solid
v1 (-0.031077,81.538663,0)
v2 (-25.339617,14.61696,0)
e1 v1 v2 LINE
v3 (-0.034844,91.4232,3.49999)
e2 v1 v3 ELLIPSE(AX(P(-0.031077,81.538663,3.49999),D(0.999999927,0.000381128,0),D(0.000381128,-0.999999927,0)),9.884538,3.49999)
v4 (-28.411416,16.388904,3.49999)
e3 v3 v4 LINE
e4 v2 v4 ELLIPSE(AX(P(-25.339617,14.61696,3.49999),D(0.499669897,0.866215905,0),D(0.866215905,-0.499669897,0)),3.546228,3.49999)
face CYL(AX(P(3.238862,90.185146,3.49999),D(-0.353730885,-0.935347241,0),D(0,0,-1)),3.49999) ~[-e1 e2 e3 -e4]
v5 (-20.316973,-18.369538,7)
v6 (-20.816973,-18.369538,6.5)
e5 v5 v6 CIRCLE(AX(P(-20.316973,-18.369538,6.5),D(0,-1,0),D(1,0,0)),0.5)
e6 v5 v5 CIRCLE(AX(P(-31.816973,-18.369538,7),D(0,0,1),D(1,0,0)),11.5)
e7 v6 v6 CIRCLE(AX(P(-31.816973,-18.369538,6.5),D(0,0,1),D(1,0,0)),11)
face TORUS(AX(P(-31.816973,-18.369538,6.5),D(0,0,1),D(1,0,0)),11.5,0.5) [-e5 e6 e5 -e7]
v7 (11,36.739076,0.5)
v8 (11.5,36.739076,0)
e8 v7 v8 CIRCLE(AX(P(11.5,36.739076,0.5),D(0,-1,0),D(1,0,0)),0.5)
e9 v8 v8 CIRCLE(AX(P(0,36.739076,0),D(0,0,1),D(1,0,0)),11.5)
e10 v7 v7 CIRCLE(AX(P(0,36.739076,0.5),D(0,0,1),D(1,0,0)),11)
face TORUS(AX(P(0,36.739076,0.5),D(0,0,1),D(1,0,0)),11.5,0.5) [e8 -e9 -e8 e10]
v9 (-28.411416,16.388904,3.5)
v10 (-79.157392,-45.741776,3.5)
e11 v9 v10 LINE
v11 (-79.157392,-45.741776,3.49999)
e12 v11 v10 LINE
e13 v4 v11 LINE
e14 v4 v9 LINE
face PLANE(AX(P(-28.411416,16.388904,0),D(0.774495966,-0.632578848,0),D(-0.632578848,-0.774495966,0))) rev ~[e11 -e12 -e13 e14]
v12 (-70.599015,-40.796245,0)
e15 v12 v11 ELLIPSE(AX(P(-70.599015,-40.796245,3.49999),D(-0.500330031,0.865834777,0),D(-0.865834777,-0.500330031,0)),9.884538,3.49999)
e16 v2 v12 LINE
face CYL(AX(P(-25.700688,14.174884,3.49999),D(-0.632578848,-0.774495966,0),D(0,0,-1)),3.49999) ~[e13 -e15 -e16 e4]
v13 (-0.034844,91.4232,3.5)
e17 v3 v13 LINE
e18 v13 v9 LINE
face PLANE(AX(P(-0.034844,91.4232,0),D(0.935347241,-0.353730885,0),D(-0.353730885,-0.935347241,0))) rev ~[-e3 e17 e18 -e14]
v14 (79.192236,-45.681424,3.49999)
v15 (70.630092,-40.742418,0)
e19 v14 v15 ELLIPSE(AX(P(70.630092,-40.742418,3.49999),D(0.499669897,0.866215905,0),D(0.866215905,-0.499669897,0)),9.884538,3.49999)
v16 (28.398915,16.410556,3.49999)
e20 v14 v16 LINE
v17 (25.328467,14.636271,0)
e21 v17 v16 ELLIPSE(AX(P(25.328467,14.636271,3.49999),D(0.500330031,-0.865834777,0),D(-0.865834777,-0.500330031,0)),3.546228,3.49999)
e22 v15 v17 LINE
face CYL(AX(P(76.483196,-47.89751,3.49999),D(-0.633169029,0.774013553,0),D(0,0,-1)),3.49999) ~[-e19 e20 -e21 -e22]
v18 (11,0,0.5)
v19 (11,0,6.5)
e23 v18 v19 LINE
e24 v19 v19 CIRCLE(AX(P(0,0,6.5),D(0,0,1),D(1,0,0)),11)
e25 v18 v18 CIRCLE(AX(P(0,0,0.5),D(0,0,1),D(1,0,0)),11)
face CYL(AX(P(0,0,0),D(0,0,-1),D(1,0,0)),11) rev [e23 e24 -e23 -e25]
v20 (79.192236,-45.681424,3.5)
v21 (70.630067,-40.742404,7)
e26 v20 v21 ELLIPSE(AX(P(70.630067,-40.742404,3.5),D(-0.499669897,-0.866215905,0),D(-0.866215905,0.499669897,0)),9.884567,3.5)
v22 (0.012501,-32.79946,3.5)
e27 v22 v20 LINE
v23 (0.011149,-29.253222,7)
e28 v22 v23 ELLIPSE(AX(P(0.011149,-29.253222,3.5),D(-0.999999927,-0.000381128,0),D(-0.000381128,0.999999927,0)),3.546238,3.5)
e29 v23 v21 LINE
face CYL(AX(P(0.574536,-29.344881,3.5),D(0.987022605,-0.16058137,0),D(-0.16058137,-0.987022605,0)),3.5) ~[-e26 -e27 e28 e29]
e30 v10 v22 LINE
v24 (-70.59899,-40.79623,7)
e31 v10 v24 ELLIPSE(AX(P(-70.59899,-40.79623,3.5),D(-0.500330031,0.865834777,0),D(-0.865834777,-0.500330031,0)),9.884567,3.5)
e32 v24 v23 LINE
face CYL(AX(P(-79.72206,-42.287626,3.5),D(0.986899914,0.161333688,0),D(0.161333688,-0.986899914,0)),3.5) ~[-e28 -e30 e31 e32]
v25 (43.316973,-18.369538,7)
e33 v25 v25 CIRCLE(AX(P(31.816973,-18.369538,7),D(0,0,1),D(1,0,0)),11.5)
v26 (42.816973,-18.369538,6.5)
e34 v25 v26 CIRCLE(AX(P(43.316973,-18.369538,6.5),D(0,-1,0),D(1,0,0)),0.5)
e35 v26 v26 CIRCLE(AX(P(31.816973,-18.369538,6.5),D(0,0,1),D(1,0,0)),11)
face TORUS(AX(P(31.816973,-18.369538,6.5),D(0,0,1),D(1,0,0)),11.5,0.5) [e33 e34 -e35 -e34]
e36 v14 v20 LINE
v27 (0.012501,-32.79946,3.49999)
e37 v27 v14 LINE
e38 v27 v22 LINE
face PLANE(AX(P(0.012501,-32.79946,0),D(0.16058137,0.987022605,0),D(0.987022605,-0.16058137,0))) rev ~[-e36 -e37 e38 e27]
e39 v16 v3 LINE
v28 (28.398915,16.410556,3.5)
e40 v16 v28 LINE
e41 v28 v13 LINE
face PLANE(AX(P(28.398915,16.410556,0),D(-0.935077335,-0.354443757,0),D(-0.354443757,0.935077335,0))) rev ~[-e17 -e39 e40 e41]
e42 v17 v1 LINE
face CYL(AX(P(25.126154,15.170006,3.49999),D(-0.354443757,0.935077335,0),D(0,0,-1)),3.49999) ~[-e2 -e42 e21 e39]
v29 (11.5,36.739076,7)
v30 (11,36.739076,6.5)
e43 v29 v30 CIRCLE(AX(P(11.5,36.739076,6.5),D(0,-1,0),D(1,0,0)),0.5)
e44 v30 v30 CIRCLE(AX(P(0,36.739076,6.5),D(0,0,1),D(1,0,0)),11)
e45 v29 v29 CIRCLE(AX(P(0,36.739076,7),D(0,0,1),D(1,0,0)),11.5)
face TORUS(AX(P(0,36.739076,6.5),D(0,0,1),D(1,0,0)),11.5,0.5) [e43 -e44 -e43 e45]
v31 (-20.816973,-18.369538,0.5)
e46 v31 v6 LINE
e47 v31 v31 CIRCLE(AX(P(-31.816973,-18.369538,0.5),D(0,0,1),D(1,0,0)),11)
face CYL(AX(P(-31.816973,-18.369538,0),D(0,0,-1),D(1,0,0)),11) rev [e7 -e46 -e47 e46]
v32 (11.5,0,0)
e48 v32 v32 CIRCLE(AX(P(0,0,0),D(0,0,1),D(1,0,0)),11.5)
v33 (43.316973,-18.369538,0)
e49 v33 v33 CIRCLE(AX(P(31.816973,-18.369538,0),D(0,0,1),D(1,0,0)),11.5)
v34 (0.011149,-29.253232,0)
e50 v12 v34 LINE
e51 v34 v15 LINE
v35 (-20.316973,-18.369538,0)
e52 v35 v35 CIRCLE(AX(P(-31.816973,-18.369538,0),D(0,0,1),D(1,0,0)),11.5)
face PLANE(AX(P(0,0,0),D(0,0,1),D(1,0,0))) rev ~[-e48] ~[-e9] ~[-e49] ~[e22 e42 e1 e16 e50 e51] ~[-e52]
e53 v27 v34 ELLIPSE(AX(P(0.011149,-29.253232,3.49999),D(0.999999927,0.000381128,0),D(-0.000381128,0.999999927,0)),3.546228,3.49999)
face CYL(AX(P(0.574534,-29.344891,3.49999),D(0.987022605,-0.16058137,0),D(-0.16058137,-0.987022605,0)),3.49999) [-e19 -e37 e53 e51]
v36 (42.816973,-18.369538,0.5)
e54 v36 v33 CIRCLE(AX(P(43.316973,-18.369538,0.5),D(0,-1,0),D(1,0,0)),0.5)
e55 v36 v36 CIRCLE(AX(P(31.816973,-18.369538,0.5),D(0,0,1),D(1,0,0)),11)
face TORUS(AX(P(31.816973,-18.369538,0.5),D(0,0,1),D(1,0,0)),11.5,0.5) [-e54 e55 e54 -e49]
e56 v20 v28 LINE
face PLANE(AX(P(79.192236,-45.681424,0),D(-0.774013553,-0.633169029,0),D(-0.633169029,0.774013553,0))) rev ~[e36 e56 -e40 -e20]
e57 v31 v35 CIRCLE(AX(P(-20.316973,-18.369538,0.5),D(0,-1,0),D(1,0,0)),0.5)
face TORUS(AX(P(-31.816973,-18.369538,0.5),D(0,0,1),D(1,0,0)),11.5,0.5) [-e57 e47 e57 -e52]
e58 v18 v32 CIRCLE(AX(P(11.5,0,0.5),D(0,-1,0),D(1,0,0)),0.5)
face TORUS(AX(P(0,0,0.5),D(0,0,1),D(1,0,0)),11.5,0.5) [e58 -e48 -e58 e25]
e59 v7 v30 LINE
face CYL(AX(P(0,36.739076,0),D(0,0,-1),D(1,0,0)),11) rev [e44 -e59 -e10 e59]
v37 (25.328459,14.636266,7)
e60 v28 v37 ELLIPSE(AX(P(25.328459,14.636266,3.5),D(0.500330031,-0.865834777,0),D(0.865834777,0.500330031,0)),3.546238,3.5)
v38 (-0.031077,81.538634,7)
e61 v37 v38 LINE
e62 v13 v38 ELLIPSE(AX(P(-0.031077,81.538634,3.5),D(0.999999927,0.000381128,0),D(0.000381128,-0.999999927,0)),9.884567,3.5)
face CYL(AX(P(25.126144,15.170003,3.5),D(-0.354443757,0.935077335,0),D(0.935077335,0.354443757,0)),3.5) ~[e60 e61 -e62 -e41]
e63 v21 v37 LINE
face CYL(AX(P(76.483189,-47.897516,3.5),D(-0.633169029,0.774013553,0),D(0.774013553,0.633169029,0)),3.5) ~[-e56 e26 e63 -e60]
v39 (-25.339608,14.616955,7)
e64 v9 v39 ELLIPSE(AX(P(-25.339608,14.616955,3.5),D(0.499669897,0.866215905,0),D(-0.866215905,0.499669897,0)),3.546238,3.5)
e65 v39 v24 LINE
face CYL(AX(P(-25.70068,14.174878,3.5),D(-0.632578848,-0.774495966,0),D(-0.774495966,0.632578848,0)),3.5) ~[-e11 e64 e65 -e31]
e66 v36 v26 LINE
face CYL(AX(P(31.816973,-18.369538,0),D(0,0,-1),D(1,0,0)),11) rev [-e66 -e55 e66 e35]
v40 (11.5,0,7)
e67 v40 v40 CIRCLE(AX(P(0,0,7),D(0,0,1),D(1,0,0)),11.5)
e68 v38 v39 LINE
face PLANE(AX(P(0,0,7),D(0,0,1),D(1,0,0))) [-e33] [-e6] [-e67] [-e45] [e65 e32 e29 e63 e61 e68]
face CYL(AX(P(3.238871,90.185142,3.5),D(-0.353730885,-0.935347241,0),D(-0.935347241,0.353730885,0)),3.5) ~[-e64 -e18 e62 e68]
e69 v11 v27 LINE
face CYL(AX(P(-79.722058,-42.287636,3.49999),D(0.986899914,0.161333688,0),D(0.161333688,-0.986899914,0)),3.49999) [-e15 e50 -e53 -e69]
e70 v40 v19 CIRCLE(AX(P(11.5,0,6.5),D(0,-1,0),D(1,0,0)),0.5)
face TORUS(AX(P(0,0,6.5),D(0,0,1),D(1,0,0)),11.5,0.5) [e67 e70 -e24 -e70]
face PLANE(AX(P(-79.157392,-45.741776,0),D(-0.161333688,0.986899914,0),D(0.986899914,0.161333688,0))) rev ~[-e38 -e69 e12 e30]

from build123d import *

# Parameters (mm, degrees)
F0_R     = 11
F1_DEPTH = 7
F2_R     = 3.5
F3_R     = 3.49999
F4_R     = 0.5
F5_R     = 0.5


# Not quite as in the source:
# - a fillet or chamfer is up to 0.001 mm smaller than in the source, because OpenCascade refuses the exact size


with BuildPart() as f1:
    # F0 (on Top) → F1 (new body)
    with BuildSketch(Plane.XY):
        Polygon((0.0125008091, -32.7994597757), (79.1922360659, -45.681424439), (28.3989149916, 16.4105559061), (-0.0348439877, 91.423200435), (-28.4114158007, 16.3889038696), (-79.1573920781, -45.7417759961), align=None)
        with Locations((-31.8169734902, -18.3695382094)):
            Circle(F0_R, mode=Mode.SUBTRACT)
        Circle(F0_R, mode=Mode.SUBTRACT)
        with Locations((31.8169734902, -18.3695382094)):
            Circle(F0_R, mode=Mode.SUBTRACT)
        with Locations((0, 36.7390764187)):
            Circle(F0_R, mode=Mode.SUBTRACT)
    extrude(amount=F1_DEPTH)

    # F2
    f2_edges = [f1.edges().sort_by_distance(p)[0] for p in [
        (-53.784404, -14.676436, 7),
        (-39.572446, -39.270618, 7),
        (-14.22313, 53.906052, 7),
        (14.182036, 53.916878, 7),
        (53.795576, -14.635434, 7),
        (39.602368, -39.240442, 7),
    ]]
    fillet(f2_edges, radius=F2_R)

    # F3 (radius 3.5 in the source; OpenCascade refuses exactly that, so slightly less here)
    f3_edges = [f1.edges().sort_by_distance(p)[0] for p in [
        (-14.22313, 53.906052, 0),
        (-53.784404, -14.676436, 0),
        (-39.572446, -39.270618, 0),
        (39.602368, -39.240442, 0),
        (53.795576, -14.635434, 0),
        (14.182036, 53.916878, 0),
    ]]
    fillet(f3_edges, radius=F3_R)

    # F4
    f4_edges = [f1.edges().sort_by_distance(p)[0] for p in [
        (20.816973, -18.369538, 7),
        (-11, 0, 7),
        (-42.816973, -18.369538, 7),
        (-11, 36.739076, 7),
    ]]
    fillet(f4_edges, radius=F4_R)

    # F5
    f5_edges = [f1.edges().sort_by_distance(p)[0] for p in [
        (20.816973, -18.369538, 0),
        (-11, 0, 0),
        (-11, 36.739076, 0),
        (-42.816973, -18.369538, 0),
    ]]
    fillet(f5_edges, radius=F5_R)


solid = f1.part
